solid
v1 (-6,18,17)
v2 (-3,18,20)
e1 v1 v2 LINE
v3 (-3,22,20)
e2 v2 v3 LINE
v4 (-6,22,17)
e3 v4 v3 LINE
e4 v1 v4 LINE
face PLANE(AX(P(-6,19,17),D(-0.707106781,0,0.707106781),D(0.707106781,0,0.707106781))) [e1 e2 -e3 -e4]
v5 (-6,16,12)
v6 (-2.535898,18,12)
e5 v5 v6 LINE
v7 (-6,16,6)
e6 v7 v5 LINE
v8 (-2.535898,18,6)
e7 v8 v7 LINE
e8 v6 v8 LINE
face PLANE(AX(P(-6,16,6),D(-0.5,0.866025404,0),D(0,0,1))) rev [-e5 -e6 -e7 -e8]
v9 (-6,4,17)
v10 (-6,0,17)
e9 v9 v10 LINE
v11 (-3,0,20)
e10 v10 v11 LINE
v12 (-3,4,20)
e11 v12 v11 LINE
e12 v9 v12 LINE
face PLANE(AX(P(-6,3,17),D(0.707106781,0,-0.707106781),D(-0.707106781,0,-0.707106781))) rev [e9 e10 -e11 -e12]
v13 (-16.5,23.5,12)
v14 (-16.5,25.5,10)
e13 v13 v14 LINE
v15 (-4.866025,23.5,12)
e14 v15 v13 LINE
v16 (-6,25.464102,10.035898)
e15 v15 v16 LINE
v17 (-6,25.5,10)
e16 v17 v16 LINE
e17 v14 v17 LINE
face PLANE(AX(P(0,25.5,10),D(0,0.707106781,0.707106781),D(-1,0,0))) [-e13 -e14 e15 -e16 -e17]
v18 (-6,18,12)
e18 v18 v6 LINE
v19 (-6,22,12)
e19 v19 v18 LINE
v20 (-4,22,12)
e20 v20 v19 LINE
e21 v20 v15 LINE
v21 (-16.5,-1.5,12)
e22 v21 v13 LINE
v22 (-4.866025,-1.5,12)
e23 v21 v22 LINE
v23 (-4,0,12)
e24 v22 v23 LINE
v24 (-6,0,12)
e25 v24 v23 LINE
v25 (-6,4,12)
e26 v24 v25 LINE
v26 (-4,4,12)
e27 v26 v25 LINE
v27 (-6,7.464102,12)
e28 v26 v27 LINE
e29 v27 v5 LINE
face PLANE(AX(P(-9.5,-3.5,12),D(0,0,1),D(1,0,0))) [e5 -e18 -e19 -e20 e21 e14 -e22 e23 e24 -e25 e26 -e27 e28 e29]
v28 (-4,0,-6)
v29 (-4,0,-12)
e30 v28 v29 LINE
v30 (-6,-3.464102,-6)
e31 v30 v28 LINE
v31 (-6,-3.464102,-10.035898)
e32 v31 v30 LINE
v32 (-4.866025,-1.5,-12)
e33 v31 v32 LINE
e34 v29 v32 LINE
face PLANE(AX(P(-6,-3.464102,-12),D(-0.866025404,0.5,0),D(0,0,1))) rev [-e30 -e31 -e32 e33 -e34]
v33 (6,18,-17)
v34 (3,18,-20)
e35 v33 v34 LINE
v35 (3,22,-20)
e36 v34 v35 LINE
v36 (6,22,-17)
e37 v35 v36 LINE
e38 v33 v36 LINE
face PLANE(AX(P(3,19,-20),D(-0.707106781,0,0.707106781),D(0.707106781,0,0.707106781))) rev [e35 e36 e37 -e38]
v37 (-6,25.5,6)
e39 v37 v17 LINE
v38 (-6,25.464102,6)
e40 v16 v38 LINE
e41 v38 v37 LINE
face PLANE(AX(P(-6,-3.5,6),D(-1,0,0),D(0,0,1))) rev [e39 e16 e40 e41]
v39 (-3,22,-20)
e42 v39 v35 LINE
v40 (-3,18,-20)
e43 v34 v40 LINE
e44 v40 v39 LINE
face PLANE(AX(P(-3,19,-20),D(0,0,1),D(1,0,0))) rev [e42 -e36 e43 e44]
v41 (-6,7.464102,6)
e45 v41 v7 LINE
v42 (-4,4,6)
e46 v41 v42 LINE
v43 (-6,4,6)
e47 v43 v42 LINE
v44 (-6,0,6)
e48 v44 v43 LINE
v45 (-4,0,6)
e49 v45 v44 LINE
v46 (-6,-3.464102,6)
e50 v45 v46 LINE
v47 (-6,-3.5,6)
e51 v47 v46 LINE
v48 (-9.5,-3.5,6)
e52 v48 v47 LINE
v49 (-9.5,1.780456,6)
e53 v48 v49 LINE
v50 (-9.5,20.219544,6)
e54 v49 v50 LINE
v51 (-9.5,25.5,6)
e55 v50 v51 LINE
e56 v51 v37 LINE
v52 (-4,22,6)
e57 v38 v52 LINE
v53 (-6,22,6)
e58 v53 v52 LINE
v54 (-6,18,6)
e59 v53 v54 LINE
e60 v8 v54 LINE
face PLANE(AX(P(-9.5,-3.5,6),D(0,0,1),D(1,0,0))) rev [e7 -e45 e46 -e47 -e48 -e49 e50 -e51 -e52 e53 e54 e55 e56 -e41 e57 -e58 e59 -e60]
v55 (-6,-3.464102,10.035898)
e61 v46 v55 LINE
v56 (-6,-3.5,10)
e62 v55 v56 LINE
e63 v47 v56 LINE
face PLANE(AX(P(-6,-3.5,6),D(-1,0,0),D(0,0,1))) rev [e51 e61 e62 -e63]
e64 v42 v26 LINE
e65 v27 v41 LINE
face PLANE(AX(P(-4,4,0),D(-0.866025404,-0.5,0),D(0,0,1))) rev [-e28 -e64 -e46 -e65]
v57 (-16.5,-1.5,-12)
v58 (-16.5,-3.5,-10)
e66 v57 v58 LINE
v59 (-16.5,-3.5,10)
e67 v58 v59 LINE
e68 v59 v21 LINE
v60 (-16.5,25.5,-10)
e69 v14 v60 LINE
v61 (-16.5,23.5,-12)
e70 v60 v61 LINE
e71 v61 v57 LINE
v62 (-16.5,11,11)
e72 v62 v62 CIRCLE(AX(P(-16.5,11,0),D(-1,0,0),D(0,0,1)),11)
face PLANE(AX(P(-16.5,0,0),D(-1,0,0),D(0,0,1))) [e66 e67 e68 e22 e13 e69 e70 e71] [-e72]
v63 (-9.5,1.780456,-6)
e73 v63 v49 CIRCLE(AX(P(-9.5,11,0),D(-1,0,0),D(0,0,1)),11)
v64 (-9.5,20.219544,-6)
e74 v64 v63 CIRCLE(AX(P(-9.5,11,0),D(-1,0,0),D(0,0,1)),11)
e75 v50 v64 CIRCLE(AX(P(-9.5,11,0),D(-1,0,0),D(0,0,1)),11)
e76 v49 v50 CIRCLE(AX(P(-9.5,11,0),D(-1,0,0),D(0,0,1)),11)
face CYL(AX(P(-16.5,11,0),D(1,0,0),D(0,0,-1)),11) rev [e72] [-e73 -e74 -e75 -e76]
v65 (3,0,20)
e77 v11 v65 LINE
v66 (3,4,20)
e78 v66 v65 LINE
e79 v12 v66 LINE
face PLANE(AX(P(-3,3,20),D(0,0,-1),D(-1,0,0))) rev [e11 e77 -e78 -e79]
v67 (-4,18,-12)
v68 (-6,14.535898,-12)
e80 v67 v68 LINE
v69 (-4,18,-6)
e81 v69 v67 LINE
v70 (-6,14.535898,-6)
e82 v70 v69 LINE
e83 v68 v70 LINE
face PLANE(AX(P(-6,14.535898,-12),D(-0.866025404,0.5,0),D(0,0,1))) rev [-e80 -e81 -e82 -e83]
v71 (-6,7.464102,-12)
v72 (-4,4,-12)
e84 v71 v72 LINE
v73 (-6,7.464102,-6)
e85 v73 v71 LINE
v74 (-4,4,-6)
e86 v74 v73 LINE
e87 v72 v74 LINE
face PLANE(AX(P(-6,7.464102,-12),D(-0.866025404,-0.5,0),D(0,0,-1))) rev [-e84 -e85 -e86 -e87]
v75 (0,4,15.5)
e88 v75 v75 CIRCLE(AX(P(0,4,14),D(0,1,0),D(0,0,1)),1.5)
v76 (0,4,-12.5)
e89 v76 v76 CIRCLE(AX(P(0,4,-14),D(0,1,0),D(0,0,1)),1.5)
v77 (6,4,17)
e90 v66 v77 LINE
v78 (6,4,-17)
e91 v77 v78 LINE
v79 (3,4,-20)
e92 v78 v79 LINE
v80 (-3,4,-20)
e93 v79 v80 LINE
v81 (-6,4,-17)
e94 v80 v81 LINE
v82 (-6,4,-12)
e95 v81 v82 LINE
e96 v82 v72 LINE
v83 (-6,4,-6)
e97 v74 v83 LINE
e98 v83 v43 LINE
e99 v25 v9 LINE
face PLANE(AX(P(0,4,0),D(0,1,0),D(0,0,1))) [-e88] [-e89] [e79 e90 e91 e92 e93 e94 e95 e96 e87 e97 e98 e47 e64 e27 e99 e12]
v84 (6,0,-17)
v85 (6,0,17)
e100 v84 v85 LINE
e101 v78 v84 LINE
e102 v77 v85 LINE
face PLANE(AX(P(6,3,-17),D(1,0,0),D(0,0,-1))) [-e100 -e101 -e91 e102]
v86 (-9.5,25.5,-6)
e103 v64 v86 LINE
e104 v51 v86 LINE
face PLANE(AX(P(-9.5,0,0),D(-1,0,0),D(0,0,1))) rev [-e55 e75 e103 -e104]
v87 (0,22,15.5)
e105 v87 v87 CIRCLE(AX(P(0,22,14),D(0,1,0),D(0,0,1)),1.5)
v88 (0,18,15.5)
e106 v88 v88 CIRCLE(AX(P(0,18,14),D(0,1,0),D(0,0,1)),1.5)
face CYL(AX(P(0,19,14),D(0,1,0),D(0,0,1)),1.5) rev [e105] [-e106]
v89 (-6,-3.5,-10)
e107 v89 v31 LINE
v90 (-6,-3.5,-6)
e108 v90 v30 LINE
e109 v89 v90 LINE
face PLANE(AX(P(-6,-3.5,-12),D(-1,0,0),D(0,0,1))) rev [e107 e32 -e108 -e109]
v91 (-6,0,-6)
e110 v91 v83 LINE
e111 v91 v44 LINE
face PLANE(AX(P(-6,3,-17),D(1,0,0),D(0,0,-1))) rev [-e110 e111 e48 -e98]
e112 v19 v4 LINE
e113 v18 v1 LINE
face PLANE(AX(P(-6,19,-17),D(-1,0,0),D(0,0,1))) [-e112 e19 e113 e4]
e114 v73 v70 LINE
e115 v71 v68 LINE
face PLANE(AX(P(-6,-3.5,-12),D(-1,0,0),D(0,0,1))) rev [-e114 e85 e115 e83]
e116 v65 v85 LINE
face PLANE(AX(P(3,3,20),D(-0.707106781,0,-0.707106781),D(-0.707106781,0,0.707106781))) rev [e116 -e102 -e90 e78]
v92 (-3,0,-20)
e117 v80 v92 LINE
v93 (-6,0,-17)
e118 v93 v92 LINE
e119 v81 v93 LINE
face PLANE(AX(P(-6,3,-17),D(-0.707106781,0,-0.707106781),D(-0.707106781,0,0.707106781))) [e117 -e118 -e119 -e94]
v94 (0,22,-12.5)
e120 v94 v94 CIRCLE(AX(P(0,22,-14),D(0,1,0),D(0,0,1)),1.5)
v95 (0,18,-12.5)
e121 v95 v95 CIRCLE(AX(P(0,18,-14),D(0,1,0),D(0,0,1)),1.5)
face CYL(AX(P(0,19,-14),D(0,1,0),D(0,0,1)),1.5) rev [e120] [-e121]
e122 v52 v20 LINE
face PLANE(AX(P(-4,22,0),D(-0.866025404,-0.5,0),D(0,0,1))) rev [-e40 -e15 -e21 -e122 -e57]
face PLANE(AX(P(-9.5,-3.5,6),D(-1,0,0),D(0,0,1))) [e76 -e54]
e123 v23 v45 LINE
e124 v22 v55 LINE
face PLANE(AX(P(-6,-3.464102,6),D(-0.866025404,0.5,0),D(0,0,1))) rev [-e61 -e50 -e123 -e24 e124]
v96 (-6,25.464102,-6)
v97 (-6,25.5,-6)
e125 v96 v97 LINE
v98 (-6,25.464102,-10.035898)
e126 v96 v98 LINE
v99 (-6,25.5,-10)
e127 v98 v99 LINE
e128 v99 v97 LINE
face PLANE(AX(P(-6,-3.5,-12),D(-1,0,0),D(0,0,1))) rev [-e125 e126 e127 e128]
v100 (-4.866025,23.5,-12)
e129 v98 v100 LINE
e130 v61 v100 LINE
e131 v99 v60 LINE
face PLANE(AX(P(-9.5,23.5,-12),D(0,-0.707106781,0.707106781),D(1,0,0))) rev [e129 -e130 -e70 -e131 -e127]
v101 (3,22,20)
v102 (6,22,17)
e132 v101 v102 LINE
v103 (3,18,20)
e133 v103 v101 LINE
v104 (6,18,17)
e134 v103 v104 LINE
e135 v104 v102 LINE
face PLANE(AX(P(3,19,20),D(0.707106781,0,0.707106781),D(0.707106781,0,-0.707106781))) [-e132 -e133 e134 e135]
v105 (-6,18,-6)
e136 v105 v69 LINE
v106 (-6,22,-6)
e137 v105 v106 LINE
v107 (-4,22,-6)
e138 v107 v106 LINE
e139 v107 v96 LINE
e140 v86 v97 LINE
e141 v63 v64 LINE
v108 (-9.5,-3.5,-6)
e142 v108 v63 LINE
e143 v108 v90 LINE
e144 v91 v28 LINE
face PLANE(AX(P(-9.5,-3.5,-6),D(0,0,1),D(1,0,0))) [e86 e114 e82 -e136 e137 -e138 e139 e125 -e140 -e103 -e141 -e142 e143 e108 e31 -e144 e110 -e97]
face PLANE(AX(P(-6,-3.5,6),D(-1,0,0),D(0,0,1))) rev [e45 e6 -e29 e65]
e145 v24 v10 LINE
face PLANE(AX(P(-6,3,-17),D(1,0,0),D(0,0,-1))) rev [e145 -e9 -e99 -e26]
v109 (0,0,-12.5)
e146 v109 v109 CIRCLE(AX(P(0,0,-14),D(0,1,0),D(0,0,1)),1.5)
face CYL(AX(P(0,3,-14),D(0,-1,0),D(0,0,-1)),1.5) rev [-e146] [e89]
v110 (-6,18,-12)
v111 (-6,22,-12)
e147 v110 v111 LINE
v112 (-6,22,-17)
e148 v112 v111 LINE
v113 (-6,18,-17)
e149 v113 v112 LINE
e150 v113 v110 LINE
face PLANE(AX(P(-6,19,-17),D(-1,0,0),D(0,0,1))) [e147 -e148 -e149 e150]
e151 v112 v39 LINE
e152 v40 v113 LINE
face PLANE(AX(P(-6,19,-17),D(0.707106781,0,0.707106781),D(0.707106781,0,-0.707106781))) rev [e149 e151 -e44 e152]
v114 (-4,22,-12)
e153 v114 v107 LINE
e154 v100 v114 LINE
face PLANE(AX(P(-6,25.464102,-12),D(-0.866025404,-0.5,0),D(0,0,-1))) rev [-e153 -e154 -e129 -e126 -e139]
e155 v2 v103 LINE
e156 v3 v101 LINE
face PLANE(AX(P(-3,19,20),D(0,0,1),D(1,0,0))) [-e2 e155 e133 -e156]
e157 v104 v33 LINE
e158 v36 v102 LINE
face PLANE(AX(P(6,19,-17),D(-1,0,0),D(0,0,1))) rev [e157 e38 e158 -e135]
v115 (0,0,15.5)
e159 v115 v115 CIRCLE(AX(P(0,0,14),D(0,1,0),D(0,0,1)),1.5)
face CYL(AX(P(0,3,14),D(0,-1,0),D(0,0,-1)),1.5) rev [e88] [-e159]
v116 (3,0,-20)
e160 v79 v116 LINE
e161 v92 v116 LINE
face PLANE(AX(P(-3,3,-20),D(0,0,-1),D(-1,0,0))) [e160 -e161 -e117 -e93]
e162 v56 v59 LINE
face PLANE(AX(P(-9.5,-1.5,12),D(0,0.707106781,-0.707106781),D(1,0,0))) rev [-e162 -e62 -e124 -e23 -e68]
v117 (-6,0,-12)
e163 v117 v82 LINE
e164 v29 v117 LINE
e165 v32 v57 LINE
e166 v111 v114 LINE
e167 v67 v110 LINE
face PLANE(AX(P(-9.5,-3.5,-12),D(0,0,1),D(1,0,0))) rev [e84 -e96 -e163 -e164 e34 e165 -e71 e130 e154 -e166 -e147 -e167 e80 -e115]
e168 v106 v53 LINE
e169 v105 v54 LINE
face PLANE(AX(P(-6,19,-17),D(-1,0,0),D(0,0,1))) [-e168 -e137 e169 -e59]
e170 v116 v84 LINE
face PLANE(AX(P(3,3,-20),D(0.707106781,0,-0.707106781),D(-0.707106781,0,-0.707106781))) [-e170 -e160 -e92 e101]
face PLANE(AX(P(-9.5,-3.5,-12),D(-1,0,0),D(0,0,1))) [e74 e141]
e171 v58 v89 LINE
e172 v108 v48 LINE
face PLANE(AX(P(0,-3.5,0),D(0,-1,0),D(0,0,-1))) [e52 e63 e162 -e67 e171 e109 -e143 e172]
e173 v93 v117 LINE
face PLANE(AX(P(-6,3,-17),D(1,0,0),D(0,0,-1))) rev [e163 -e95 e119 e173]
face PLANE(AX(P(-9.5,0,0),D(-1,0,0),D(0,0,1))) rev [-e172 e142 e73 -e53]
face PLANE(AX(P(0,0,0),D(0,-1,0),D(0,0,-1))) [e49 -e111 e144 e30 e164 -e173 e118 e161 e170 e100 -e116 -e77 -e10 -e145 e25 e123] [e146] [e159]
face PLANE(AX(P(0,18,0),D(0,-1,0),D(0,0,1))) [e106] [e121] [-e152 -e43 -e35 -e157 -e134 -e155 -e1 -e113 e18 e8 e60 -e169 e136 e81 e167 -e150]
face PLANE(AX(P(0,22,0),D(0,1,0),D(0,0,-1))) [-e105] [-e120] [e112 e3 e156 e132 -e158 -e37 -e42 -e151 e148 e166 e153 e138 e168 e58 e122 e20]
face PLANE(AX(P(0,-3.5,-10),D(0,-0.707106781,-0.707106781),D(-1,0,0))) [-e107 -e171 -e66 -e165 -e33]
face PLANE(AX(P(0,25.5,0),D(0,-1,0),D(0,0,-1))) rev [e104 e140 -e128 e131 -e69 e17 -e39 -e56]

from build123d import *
from OCP.BRepFilletAPI import BRepFilletAPI_MakeChamfer

# Parameters (mm, degrees)
SKETCH1_R           = 1.5
BOSS_EXTRUDE1_DEPTH = 3
BOSS_EXTRUDE2_START = 22.5
SKETCH2_W           = 3.5
SKETCH2_H           = 6
BOSS_EXTRUDE2_DEPTH = 29
SKETCH4_R           = 1.5
BOSS_EXTRUDE5_DEPTH = 1
CHAMFER2_SIZE       = 2
CHAMFER2_SIZE2      = 3.464101615
SKETCH3_W           = 24
SKETCH3_H           = 29
SKETCH3_R           = 11
BOSS_EXTRUDE4_DEPTH = 7
CHAMFER3_SIZE       = 2
MIRROR1_START       = 18
MIRROR1_OUTLINE_R   = 1.5
MIRROR1_DEPTH       = 4
MIRROR1_START_2     = -12
MIRROR1_2_DEPTH     = 6
MIRROR1_START_3     = 6
MIRROR1_3_DEPTH     = 6
MIRROR1_START_4     = 25.102290732
MIRROR1_4_OUTLINE_W = 2
MIRROR1_4_OUTLINE_H = 18.102290732
MIRROR1_4_DEPTH     = 1.897709268
MIRROR1_START_5     = 7.071067812
MIRROR1_5_OUTLINE_W = 2
MIRROR1_5_OUTLINE_H = 2.897709268
MIRROR1_5_DEPTH     = 3.889087296


with BuildPart() as part:
    # Sketch1 → Boss-Extrude1 (new body)
    with BuildSketch(Plane(origin=(0, 0, 0), x_dir=(1, 0, 0), z_dir=(0, 1, 0))):
        Polygon((-6, 17), (-3, 20), (3, 20), (6, 17), (6, -17), (3, -20), (-3, -20), (-6, -17), align=None)
        with Locations(Location((0, 14, 0), (0, 0, 270))):
            Circle(SKETCH1_R, mode=Mode.SUBTRACT)
        with Locations(Location((0, -14, 0), (0, 0, 270))):
            Circle(SKETCH1_R, mode=Mode.SUBTRACT)
    extrude(amount=BOSS_EXTRUDE1_DEPTH)

    # Sketch2 → Boss-Extrude2 (add)
    with BuildSketch(Plane(origin=(0, 3, 0), x_dir=(1, 0, 0), z_dir=(0, 1, 0)).offset(BOSS_EXTRUDE2_START)):
        with Locations((-7.75, 9)):
            Rectangle(SKETCH2_W, SKETCH2_H)
        with Locations((-7.75, -9)):
            Rectangle(SKETCH2_W, SKETCH2_H)
    extrude(amount=-BOSS_EXTRUDE2_DEPTH)

    # Sketch4 → Boss-Extrude5 (add)
    with BuildSketch(Plane(origin=(0, 3, 0), x_dir=(1, 0, 0), z_dir=(0, 1, 0))):
        Polygon((-3, 20), (-6, 17), (-6, 12), (-6, 6), (-6, -6), (-6, -12), (-6, -17), (-3, -20), (3, -20), (6, -17), (6, 17), (3, 20), align=None)
        with Locations(Location((0, 14, 0), (0, 0, 270))):
            Circle(SKETCH4_R, mode=Mode.SUBTRACT)
        with Locations(Location((0, -14, 0), (0, 0, 270))):
            Circle(SKETCH4_R, mode=Mode.SUBTRACT)
    extrude(amount=BOSS_EXTRUDE5_DEPTH)

    # Chamfer2: one chamfer whose edges measure the first distance from different faces: ONE call of the kernel's chamfer builder (chamfer() names one face for all edges)
    chamfer2_edges_1 = [part.edges().sort_by_distance(p)[0] for p in [
        (-6, 0, -9),
        (-6, 0, 9),
    ]]
    chamfer2_side_1 = [part.faces().sort_by_distance(p)[0] for p in [
        (0, 0, 0),
    ]]
    chamfer2_edges_2 = [part.edges().sort_by_distance(p)[0] for p in [
        (-6, 4, -9),
        (-6, 4, 9),
    ]]
    chamfer2_side_2 = [part.faces().sort_by_distance(p)[0] for p in [
        (0, 4, 0),
    ]]
    chamfer2 = BRepFilletAPI_MakeChamfer(part.part.solid().wrapped)
    for e in chamfer2_edges_1:
        chamfer2.Add(CHAMFER2_SIZE, CHAMFER2_SIZE2, e.wrapped, chamfer2_side_1[0].wrapped)  # the first distance lies on this face
    for e in chamfer2_edges_2:
        chamfer2.Add(CHAMFER2_SIZE, CHAMFER2_SIZE2, e.wrapped, chamfer2_side_2[0].wrapped)  # the first distance lies on this face
    add(Compound.cast(chamfer2.Shape()), mode=Mode.REPLACE)

    # Sketch3 → Boss-Extrude4 (add)
    with BuildSketch(Plane.ZY.offset(9.5)):
        with Locations((0, 11)):
            Rectangle(SKETCH3_W, SKETCH3_H)
        with Locations(Location((0, 11, 0), (0, 0, 236.944268849))):
            Circle(SKETCH3_R, mode=Mode.SUBTRACT)
    extrude(amount=BOSS_EXTRUDE4_DEPTH)

    # Chamfer3
    chamfer3_edges = [part.edges().sort_by_distance(p)[0] for p in [
        (-11.25, 25.5, -12),
        (-11.25, -3.5, -12),
        (-11.25, -3.5, 12),
        (-11.25, 25.5, 12),
    ]]
    chamfer(chamfer3_edges, length=CHAMFER3_SIZE)

    # Mirror1: read off the stored shape, not the designer's step
    # Mirror1 outline → Mirror1 (add)
    with BuildSketch(Plane(origin=(0, 0, 0), x_dir=(1, 0, 0), z_dir=(0, 1, 0)).offset(MIRROR1_START)):
        Polygon((-6, 17), (-6, 6), (-6, -6), (-6, -17), (-3, -20), (3, -20), (6, -17), (6, 17), (3, 20), (-3, 20), align=None)
        with Locations((0, -14)):
            Circle(MIRROR1_OUTLINE_R, mode=Mode.SUBTRACT)
        with Locations((0, 14)):
            Circle(MIRROR1_OUTLINE_R, mode=Mode.SUBTRACT)
    extrude(amount=MIRROR1_DEPTH)

    # Mirror1 2 outline → Mirror1 2 (add)
    with BuildSketch(Plane.XY.offset(MIRROR1_START_2)):
        Polygon((-6, 14.535898385), (-4, 18), (-6, 18), align=None)
        Polygon((-4, 22), (-6, 25.464101615), (-6, 22), align=None)
    extrude(amount=MIRROR1_2_DEPTH)

    # Mirror1 3 outline → Mirror1 3 (add)
    with BuildSketch(Plane.XY.offset(MIRROR1_START_3)):
        Polygon((-2.535898385, 18), (-6, 18), (-6, 16), align=None)
        Polygon((-4, 22), (-6, 25.464101615), (-6, 22), align=None)
    extrude(amount=MIRROR1_3_DEPTH)

    # Mirror1 4 outline → Mirror1 4 (cut)
    with BuildSketch(Plane(origin=(0, 0, 0), x_dir=(1, 0, 0), z_dir=(0, 0.7071067811865466, 0.7071067811865486)).offset(MIRROR1_START_4)):
        with Locations((-5, 16.051145366)):
            Rectangle(MIRROR1_4_OUTLINE_W, MIRROR1_4_OUTLINE_H)
    extrude(amount=MIRROR1_4_DEPTH, mode=Mode.SUBTRACT)

    # Mirror1 5 outline → Mirror1 5 (cut)
    with BuildSketch(Plane(origin=(0, 0, 0), x_dir=(1, 0, 0), z_dir=(0, 0.7071067811865466, 0.7071067811865486)).offset(MIRROR1_START_5)):
        with Locations((-5, 26.551145366)):
            Rectangle(MIRROR1_5_OUTLINE_W, MIRROR1_5_OUTLINE_H)
    extrude(amount=MIRROR1_5_DEPTH, mode=Mode.SUBTRACT)


solid = part.part
